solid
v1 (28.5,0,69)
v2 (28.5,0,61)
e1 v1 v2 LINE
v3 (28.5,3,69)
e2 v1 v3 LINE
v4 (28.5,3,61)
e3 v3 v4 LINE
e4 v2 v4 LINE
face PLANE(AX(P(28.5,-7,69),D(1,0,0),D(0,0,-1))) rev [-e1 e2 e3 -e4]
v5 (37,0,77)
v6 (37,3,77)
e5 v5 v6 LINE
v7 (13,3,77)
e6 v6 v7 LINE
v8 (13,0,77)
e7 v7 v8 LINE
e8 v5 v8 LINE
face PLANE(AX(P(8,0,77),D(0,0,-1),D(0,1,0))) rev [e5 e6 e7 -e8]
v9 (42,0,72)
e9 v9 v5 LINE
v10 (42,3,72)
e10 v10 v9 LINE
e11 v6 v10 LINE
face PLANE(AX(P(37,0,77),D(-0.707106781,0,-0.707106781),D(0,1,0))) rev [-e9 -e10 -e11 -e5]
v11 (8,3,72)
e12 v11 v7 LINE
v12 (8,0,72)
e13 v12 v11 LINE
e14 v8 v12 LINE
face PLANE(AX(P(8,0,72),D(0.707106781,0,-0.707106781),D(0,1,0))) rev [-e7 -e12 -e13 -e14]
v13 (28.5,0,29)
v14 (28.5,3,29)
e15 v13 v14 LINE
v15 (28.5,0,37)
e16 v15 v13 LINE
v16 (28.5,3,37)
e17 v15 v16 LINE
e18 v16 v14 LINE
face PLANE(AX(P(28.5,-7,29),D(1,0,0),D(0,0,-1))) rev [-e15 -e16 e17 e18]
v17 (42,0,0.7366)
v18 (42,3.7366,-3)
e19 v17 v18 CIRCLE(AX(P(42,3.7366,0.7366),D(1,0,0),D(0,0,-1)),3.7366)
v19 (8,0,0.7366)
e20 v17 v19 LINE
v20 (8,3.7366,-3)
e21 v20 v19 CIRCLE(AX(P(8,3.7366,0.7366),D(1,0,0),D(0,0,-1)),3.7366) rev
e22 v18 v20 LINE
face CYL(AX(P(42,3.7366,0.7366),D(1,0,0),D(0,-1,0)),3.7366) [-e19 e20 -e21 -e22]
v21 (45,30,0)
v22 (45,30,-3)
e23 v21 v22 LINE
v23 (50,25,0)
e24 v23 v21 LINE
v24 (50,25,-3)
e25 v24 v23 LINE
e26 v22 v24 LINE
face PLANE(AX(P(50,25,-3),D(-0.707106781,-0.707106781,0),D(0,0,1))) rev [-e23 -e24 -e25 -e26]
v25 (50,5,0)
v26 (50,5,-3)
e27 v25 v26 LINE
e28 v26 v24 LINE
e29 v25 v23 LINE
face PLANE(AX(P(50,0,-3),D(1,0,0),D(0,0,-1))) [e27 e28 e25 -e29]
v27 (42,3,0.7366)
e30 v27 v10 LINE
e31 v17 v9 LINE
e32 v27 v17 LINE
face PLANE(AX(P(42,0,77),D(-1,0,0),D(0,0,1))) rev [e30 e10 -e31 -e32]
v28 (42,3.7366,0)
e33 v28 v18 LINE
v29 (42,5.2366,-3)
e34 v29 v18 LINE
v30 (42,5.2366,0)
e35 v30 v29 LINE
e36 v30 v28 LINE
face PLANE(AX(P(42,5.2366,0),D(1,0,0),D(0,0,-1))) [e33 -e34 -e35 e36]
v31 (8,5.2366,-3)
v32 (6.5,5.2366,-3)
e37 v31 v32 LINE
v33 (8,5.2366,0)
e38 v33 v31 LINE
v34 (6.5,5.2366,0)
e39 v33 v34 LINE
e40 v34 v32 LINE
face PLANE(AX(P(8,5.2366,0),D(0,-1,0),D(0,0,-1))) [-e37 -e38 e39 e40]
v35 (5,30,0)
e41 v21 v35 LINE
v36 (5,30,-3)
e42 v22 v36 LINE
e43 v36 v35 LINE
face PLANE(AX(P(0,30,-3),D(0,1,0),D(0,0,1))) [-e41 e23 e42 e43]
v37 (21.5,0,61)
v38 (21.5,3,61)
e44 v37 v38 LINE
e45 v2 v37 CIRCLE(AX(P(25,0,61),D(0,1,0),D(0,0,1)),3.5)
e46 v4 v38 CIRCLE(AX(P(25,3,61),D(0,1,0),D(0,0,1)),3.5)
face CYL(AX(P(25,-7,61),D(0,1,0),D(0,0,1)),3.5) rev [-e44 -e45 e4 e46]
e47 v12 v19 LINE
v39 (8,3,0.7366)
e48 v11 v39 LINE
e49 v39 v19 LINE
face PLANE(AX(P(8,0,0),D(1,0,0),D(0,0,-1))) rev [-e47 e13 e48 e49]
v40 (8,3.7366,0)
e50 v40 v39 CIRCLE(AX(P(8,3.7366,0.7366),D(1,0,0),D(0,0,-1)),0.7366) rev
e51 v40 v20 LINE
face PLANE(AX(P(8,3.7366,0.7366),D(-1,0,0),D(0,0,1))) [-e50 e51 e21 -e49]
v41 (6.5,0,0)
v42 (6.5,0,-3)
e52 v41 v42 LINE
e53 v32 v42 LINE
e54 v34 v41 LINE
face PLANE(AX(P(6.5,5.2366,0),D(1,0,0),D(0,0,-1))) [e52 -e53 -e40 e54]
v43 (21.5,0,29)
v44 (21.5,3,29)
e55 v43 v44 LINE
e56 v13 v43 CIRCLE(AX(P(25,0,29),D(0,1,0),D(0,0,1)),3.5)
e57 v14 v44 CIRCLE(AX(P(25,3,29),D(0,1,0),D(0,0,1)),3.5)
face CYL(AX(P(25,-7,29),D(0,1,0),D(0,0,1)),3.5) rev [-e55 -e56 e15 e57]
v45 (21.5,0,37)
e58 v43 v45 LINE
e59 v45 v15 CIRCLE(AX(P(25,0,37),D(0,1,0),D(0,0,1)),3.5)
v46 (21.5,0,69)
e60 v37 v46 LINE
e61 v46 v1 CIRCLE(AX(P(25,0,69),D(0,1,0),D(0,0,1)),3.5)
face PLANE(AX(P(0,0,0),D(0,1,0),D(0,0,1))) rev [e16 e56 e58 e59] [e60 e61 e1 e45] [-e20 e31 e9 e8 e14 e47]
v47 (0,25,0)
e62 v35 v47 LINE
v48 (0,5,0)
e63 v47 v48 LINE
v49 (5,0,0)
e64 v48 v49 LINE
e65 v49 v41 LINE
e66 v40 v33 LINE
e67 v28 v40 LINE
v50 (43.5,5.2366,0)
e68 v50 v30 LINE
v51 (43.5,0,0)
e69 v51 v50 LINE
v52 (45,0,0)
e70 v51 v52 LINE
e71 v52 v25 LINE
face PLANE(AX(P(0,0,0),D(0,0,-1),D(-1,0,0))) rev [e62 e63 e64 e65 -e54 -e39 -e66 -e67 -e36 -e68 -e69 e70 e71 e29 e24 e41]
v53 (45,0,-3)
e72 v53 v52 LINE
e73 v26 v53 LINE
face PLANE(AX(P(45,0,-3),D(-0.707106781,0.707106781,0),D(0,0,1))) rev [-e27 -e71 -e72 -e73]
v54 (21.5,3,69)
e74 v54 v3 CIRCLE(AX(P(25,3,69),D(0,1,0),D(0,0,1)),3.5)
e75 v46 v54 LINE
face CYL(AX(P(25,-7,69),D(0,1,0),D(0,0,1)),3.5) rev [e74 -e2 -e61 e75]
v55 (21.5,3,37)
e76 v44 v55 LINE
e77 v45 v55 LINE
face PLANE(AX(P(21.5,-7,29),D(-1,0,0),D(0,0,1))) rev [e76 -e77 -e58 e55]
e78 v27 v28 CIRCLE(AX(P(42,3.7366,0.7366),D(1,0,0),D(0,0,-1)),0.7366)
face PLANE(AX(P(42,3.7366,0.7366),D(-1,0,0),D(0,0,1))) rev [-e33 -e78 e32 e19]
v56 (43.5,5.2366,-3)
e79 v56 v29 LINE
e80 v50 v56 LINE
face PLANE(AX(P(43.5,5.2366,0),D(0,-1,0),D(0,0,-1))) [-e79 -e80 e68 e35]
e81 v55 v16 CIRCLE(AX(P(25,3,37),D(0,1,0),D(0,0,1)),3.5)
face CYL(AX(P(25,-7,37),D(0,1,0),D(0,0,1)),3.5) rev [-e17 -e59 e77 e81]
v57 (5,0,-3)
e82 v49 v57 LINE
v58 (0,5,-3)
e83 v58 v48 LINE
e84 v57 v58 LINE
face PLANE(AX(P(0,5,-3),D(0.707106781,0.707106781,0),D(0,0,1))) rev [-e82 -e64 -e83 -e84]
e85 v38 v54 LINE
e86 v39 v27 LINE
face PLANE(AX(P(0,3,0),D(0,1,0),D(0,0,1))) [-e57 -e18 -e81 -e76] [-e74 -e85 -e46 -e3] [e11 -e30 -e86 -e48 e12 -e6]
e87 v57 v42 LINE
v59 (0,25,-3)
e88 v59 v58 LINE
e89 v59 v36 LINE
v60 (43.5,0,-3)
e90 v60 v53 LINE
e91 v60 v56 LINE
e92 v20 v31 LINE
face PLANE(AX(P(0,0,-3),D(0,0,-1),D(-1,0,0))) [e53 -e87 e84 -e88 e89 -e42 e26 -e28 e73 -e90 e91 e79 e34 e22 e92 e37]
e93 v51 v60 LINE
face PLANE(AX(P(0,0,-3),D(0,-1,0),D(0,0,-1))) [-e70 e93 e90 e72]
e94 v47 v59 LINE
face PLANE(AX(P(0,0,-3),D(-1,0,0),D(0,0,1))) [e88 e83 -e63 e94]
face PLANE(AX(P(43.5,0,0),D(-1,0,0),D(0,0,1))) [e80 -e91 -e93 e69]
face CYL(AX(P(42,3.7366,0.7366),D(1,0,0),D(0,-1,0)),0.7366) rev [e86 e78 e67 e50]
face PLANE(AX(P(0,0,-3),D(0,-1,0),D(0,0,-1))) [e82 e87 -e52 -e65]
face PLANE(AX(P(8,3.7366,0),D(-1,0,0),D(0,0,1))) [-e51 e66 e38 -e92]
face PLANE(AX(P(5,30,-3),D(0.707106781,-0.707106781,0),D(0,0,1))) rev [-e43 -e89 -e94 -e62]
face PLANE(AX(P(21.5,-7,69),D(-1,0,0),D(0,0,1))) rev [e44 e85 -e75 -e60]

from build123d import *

# Parameters (mm, degrees)
SKETCH_1_W                        = 50
SKETCH_1_H                        = 30
SM_BASE_FLANGE_1_DEPTH            = 3
SM_EDGE_FLANGE_1_STRIP_W          = 13.4732
SM_EDGE_FLANGE_1_STRIP_H          = 3
SM_EDGE_FLANGE_1_STRIP_CUT_DEPTH  = 34
SM_EDGE_FLANGE_1_RELIEF_W         = 14.9732
SM_EDGE_FLANGE_1_RELIEF_H         = 1.5
SM_EDGE_FLANGE_1_RELIEF_CUT_DEPTH = 3
SM_EDGE_FLANGE_1_DEPTH            = 34
CHAMFER_1_SIZE                    = 5
CUT_EXTRUDE_1_DEPTH               = 10


# Sheet-metal steps are written as plain solids
with BuildPart() as part:
    # Sketch 1 → 基体-法兰1 (new body)
    with BuildSketch(Plane.XY):
        with Locations((25, 15)):
            Rectangle(SKETCH_1_W, SKETCH_1_H)
    extrude(amount=-SM_BASE_FLANGE_1_DEPTH)

    # 边线-法兰1 strip (across the edge) → 边线-法兰1 strip cut (cut)
    with BuildSketch(Plane.YZ.offset(8)):
        with Locations((-3, -1.5)):
            Rectangle(SM_EDGE_FLANGE_1_STRIP_W, SM_EDGE_FLANGE_1_STRIP_H)
    extrude(amount=SM_EDGE_FLANGE_1_STRIP_CUT_DEPTH, mode=Mode.SUBTRACT)

    # 边线-法兰1 relief (on the sheet) → 边线-法兰1 relief cut (cut)
    with BuildSketch(Plane(origin=(8, 3.7366, 0), x_dir=(0, 1, 0), z_dir=(0, 0, 1))):
        with Locations((-5.9866, 0.75)):
            Rectangle(SM_EDGE_FLANGE_1_RELIEF_W, SM_EDGE_FLANGE_1_RELIEF_H)
        with Locations((-5.9866, -34.75)):
            Rectangle(SM_EDGE_FLANGE_1_RELIEF_W, SM_EDGE_FLANGE_1_RELIEF_H)
    extrude(amount=-SM_EDGE_FLANGE_1_RELIEF_CUT_DEPTH, mode=Mode.SUBTRACT)

    # 边线-法兰1 section (across the edge) → 边线-法兰1 (add)
    with BuildSketch(Plane.YZ.offset(8)):
        with BuildLine():
            Line((0, 0.7366), (0, 77))
            Line((0, 77), (3, 77))
            Line((3, 77), (3, 0.7366))
            ThreePointArc((3, 0.7366), (3.215745145, 0.215745145), (3.7366, 0))
            Line((3.7366, 0), (3.7366, -3))
            ThreePointArc((3.7366, -3), (1.094424801, -1.905575199), (0, 0.7366))
        make_face()
    extrude(amount=SM_EDGE_FLANGE_1_DEPTH)

    # 倒角1
    chamfer_1_edges = [part.edges().sort_by_distance(p)[0] for p in [
        (8, 1.5, 77),
        (42, 1.5, 77),
        (0, 30, -1.5),
        (50, 30, -1.5),
        (50, 0, -1.5),
        (0, 0, -1.5),
    ]]
    chamfer(chamfer_1_edges, length=CHAMFER_1_SIZE)

    # 草图9 → 切除-拉伸1 (cut)
    with BuildSketch(Plane(origin=(0, 3, 0), x_dir=(1, 0, 0), z_dir=(0, 1, 0))):
        with BuildLine():
            Line((28.5, -29), (28.5, -37))
            ThreePointArc((28.5, -37), (25, -40.5), (21.5, -37))
            Line((21.5, -37), (21.5, -29))
            ThreePointArc((21.5, -29), (25, -25.5), (28.5, -29))
        make_face()
        with BuildLine():
            Line((21.5, -69), (21.5, -61))
            ThreePointArc((21.5, -61), (25, -57.5), (28.5, -61))
            Line((28.5, -61), (28.5, -69))
            ThreePointArc((28.5, -69), (25, -72.5), (21.5, -69))
        make_face()
    extrude(amount=-CUT_EXTRUDE_1_DEPTH, mode=Mode.SUBTRACT)


solid = part.part
